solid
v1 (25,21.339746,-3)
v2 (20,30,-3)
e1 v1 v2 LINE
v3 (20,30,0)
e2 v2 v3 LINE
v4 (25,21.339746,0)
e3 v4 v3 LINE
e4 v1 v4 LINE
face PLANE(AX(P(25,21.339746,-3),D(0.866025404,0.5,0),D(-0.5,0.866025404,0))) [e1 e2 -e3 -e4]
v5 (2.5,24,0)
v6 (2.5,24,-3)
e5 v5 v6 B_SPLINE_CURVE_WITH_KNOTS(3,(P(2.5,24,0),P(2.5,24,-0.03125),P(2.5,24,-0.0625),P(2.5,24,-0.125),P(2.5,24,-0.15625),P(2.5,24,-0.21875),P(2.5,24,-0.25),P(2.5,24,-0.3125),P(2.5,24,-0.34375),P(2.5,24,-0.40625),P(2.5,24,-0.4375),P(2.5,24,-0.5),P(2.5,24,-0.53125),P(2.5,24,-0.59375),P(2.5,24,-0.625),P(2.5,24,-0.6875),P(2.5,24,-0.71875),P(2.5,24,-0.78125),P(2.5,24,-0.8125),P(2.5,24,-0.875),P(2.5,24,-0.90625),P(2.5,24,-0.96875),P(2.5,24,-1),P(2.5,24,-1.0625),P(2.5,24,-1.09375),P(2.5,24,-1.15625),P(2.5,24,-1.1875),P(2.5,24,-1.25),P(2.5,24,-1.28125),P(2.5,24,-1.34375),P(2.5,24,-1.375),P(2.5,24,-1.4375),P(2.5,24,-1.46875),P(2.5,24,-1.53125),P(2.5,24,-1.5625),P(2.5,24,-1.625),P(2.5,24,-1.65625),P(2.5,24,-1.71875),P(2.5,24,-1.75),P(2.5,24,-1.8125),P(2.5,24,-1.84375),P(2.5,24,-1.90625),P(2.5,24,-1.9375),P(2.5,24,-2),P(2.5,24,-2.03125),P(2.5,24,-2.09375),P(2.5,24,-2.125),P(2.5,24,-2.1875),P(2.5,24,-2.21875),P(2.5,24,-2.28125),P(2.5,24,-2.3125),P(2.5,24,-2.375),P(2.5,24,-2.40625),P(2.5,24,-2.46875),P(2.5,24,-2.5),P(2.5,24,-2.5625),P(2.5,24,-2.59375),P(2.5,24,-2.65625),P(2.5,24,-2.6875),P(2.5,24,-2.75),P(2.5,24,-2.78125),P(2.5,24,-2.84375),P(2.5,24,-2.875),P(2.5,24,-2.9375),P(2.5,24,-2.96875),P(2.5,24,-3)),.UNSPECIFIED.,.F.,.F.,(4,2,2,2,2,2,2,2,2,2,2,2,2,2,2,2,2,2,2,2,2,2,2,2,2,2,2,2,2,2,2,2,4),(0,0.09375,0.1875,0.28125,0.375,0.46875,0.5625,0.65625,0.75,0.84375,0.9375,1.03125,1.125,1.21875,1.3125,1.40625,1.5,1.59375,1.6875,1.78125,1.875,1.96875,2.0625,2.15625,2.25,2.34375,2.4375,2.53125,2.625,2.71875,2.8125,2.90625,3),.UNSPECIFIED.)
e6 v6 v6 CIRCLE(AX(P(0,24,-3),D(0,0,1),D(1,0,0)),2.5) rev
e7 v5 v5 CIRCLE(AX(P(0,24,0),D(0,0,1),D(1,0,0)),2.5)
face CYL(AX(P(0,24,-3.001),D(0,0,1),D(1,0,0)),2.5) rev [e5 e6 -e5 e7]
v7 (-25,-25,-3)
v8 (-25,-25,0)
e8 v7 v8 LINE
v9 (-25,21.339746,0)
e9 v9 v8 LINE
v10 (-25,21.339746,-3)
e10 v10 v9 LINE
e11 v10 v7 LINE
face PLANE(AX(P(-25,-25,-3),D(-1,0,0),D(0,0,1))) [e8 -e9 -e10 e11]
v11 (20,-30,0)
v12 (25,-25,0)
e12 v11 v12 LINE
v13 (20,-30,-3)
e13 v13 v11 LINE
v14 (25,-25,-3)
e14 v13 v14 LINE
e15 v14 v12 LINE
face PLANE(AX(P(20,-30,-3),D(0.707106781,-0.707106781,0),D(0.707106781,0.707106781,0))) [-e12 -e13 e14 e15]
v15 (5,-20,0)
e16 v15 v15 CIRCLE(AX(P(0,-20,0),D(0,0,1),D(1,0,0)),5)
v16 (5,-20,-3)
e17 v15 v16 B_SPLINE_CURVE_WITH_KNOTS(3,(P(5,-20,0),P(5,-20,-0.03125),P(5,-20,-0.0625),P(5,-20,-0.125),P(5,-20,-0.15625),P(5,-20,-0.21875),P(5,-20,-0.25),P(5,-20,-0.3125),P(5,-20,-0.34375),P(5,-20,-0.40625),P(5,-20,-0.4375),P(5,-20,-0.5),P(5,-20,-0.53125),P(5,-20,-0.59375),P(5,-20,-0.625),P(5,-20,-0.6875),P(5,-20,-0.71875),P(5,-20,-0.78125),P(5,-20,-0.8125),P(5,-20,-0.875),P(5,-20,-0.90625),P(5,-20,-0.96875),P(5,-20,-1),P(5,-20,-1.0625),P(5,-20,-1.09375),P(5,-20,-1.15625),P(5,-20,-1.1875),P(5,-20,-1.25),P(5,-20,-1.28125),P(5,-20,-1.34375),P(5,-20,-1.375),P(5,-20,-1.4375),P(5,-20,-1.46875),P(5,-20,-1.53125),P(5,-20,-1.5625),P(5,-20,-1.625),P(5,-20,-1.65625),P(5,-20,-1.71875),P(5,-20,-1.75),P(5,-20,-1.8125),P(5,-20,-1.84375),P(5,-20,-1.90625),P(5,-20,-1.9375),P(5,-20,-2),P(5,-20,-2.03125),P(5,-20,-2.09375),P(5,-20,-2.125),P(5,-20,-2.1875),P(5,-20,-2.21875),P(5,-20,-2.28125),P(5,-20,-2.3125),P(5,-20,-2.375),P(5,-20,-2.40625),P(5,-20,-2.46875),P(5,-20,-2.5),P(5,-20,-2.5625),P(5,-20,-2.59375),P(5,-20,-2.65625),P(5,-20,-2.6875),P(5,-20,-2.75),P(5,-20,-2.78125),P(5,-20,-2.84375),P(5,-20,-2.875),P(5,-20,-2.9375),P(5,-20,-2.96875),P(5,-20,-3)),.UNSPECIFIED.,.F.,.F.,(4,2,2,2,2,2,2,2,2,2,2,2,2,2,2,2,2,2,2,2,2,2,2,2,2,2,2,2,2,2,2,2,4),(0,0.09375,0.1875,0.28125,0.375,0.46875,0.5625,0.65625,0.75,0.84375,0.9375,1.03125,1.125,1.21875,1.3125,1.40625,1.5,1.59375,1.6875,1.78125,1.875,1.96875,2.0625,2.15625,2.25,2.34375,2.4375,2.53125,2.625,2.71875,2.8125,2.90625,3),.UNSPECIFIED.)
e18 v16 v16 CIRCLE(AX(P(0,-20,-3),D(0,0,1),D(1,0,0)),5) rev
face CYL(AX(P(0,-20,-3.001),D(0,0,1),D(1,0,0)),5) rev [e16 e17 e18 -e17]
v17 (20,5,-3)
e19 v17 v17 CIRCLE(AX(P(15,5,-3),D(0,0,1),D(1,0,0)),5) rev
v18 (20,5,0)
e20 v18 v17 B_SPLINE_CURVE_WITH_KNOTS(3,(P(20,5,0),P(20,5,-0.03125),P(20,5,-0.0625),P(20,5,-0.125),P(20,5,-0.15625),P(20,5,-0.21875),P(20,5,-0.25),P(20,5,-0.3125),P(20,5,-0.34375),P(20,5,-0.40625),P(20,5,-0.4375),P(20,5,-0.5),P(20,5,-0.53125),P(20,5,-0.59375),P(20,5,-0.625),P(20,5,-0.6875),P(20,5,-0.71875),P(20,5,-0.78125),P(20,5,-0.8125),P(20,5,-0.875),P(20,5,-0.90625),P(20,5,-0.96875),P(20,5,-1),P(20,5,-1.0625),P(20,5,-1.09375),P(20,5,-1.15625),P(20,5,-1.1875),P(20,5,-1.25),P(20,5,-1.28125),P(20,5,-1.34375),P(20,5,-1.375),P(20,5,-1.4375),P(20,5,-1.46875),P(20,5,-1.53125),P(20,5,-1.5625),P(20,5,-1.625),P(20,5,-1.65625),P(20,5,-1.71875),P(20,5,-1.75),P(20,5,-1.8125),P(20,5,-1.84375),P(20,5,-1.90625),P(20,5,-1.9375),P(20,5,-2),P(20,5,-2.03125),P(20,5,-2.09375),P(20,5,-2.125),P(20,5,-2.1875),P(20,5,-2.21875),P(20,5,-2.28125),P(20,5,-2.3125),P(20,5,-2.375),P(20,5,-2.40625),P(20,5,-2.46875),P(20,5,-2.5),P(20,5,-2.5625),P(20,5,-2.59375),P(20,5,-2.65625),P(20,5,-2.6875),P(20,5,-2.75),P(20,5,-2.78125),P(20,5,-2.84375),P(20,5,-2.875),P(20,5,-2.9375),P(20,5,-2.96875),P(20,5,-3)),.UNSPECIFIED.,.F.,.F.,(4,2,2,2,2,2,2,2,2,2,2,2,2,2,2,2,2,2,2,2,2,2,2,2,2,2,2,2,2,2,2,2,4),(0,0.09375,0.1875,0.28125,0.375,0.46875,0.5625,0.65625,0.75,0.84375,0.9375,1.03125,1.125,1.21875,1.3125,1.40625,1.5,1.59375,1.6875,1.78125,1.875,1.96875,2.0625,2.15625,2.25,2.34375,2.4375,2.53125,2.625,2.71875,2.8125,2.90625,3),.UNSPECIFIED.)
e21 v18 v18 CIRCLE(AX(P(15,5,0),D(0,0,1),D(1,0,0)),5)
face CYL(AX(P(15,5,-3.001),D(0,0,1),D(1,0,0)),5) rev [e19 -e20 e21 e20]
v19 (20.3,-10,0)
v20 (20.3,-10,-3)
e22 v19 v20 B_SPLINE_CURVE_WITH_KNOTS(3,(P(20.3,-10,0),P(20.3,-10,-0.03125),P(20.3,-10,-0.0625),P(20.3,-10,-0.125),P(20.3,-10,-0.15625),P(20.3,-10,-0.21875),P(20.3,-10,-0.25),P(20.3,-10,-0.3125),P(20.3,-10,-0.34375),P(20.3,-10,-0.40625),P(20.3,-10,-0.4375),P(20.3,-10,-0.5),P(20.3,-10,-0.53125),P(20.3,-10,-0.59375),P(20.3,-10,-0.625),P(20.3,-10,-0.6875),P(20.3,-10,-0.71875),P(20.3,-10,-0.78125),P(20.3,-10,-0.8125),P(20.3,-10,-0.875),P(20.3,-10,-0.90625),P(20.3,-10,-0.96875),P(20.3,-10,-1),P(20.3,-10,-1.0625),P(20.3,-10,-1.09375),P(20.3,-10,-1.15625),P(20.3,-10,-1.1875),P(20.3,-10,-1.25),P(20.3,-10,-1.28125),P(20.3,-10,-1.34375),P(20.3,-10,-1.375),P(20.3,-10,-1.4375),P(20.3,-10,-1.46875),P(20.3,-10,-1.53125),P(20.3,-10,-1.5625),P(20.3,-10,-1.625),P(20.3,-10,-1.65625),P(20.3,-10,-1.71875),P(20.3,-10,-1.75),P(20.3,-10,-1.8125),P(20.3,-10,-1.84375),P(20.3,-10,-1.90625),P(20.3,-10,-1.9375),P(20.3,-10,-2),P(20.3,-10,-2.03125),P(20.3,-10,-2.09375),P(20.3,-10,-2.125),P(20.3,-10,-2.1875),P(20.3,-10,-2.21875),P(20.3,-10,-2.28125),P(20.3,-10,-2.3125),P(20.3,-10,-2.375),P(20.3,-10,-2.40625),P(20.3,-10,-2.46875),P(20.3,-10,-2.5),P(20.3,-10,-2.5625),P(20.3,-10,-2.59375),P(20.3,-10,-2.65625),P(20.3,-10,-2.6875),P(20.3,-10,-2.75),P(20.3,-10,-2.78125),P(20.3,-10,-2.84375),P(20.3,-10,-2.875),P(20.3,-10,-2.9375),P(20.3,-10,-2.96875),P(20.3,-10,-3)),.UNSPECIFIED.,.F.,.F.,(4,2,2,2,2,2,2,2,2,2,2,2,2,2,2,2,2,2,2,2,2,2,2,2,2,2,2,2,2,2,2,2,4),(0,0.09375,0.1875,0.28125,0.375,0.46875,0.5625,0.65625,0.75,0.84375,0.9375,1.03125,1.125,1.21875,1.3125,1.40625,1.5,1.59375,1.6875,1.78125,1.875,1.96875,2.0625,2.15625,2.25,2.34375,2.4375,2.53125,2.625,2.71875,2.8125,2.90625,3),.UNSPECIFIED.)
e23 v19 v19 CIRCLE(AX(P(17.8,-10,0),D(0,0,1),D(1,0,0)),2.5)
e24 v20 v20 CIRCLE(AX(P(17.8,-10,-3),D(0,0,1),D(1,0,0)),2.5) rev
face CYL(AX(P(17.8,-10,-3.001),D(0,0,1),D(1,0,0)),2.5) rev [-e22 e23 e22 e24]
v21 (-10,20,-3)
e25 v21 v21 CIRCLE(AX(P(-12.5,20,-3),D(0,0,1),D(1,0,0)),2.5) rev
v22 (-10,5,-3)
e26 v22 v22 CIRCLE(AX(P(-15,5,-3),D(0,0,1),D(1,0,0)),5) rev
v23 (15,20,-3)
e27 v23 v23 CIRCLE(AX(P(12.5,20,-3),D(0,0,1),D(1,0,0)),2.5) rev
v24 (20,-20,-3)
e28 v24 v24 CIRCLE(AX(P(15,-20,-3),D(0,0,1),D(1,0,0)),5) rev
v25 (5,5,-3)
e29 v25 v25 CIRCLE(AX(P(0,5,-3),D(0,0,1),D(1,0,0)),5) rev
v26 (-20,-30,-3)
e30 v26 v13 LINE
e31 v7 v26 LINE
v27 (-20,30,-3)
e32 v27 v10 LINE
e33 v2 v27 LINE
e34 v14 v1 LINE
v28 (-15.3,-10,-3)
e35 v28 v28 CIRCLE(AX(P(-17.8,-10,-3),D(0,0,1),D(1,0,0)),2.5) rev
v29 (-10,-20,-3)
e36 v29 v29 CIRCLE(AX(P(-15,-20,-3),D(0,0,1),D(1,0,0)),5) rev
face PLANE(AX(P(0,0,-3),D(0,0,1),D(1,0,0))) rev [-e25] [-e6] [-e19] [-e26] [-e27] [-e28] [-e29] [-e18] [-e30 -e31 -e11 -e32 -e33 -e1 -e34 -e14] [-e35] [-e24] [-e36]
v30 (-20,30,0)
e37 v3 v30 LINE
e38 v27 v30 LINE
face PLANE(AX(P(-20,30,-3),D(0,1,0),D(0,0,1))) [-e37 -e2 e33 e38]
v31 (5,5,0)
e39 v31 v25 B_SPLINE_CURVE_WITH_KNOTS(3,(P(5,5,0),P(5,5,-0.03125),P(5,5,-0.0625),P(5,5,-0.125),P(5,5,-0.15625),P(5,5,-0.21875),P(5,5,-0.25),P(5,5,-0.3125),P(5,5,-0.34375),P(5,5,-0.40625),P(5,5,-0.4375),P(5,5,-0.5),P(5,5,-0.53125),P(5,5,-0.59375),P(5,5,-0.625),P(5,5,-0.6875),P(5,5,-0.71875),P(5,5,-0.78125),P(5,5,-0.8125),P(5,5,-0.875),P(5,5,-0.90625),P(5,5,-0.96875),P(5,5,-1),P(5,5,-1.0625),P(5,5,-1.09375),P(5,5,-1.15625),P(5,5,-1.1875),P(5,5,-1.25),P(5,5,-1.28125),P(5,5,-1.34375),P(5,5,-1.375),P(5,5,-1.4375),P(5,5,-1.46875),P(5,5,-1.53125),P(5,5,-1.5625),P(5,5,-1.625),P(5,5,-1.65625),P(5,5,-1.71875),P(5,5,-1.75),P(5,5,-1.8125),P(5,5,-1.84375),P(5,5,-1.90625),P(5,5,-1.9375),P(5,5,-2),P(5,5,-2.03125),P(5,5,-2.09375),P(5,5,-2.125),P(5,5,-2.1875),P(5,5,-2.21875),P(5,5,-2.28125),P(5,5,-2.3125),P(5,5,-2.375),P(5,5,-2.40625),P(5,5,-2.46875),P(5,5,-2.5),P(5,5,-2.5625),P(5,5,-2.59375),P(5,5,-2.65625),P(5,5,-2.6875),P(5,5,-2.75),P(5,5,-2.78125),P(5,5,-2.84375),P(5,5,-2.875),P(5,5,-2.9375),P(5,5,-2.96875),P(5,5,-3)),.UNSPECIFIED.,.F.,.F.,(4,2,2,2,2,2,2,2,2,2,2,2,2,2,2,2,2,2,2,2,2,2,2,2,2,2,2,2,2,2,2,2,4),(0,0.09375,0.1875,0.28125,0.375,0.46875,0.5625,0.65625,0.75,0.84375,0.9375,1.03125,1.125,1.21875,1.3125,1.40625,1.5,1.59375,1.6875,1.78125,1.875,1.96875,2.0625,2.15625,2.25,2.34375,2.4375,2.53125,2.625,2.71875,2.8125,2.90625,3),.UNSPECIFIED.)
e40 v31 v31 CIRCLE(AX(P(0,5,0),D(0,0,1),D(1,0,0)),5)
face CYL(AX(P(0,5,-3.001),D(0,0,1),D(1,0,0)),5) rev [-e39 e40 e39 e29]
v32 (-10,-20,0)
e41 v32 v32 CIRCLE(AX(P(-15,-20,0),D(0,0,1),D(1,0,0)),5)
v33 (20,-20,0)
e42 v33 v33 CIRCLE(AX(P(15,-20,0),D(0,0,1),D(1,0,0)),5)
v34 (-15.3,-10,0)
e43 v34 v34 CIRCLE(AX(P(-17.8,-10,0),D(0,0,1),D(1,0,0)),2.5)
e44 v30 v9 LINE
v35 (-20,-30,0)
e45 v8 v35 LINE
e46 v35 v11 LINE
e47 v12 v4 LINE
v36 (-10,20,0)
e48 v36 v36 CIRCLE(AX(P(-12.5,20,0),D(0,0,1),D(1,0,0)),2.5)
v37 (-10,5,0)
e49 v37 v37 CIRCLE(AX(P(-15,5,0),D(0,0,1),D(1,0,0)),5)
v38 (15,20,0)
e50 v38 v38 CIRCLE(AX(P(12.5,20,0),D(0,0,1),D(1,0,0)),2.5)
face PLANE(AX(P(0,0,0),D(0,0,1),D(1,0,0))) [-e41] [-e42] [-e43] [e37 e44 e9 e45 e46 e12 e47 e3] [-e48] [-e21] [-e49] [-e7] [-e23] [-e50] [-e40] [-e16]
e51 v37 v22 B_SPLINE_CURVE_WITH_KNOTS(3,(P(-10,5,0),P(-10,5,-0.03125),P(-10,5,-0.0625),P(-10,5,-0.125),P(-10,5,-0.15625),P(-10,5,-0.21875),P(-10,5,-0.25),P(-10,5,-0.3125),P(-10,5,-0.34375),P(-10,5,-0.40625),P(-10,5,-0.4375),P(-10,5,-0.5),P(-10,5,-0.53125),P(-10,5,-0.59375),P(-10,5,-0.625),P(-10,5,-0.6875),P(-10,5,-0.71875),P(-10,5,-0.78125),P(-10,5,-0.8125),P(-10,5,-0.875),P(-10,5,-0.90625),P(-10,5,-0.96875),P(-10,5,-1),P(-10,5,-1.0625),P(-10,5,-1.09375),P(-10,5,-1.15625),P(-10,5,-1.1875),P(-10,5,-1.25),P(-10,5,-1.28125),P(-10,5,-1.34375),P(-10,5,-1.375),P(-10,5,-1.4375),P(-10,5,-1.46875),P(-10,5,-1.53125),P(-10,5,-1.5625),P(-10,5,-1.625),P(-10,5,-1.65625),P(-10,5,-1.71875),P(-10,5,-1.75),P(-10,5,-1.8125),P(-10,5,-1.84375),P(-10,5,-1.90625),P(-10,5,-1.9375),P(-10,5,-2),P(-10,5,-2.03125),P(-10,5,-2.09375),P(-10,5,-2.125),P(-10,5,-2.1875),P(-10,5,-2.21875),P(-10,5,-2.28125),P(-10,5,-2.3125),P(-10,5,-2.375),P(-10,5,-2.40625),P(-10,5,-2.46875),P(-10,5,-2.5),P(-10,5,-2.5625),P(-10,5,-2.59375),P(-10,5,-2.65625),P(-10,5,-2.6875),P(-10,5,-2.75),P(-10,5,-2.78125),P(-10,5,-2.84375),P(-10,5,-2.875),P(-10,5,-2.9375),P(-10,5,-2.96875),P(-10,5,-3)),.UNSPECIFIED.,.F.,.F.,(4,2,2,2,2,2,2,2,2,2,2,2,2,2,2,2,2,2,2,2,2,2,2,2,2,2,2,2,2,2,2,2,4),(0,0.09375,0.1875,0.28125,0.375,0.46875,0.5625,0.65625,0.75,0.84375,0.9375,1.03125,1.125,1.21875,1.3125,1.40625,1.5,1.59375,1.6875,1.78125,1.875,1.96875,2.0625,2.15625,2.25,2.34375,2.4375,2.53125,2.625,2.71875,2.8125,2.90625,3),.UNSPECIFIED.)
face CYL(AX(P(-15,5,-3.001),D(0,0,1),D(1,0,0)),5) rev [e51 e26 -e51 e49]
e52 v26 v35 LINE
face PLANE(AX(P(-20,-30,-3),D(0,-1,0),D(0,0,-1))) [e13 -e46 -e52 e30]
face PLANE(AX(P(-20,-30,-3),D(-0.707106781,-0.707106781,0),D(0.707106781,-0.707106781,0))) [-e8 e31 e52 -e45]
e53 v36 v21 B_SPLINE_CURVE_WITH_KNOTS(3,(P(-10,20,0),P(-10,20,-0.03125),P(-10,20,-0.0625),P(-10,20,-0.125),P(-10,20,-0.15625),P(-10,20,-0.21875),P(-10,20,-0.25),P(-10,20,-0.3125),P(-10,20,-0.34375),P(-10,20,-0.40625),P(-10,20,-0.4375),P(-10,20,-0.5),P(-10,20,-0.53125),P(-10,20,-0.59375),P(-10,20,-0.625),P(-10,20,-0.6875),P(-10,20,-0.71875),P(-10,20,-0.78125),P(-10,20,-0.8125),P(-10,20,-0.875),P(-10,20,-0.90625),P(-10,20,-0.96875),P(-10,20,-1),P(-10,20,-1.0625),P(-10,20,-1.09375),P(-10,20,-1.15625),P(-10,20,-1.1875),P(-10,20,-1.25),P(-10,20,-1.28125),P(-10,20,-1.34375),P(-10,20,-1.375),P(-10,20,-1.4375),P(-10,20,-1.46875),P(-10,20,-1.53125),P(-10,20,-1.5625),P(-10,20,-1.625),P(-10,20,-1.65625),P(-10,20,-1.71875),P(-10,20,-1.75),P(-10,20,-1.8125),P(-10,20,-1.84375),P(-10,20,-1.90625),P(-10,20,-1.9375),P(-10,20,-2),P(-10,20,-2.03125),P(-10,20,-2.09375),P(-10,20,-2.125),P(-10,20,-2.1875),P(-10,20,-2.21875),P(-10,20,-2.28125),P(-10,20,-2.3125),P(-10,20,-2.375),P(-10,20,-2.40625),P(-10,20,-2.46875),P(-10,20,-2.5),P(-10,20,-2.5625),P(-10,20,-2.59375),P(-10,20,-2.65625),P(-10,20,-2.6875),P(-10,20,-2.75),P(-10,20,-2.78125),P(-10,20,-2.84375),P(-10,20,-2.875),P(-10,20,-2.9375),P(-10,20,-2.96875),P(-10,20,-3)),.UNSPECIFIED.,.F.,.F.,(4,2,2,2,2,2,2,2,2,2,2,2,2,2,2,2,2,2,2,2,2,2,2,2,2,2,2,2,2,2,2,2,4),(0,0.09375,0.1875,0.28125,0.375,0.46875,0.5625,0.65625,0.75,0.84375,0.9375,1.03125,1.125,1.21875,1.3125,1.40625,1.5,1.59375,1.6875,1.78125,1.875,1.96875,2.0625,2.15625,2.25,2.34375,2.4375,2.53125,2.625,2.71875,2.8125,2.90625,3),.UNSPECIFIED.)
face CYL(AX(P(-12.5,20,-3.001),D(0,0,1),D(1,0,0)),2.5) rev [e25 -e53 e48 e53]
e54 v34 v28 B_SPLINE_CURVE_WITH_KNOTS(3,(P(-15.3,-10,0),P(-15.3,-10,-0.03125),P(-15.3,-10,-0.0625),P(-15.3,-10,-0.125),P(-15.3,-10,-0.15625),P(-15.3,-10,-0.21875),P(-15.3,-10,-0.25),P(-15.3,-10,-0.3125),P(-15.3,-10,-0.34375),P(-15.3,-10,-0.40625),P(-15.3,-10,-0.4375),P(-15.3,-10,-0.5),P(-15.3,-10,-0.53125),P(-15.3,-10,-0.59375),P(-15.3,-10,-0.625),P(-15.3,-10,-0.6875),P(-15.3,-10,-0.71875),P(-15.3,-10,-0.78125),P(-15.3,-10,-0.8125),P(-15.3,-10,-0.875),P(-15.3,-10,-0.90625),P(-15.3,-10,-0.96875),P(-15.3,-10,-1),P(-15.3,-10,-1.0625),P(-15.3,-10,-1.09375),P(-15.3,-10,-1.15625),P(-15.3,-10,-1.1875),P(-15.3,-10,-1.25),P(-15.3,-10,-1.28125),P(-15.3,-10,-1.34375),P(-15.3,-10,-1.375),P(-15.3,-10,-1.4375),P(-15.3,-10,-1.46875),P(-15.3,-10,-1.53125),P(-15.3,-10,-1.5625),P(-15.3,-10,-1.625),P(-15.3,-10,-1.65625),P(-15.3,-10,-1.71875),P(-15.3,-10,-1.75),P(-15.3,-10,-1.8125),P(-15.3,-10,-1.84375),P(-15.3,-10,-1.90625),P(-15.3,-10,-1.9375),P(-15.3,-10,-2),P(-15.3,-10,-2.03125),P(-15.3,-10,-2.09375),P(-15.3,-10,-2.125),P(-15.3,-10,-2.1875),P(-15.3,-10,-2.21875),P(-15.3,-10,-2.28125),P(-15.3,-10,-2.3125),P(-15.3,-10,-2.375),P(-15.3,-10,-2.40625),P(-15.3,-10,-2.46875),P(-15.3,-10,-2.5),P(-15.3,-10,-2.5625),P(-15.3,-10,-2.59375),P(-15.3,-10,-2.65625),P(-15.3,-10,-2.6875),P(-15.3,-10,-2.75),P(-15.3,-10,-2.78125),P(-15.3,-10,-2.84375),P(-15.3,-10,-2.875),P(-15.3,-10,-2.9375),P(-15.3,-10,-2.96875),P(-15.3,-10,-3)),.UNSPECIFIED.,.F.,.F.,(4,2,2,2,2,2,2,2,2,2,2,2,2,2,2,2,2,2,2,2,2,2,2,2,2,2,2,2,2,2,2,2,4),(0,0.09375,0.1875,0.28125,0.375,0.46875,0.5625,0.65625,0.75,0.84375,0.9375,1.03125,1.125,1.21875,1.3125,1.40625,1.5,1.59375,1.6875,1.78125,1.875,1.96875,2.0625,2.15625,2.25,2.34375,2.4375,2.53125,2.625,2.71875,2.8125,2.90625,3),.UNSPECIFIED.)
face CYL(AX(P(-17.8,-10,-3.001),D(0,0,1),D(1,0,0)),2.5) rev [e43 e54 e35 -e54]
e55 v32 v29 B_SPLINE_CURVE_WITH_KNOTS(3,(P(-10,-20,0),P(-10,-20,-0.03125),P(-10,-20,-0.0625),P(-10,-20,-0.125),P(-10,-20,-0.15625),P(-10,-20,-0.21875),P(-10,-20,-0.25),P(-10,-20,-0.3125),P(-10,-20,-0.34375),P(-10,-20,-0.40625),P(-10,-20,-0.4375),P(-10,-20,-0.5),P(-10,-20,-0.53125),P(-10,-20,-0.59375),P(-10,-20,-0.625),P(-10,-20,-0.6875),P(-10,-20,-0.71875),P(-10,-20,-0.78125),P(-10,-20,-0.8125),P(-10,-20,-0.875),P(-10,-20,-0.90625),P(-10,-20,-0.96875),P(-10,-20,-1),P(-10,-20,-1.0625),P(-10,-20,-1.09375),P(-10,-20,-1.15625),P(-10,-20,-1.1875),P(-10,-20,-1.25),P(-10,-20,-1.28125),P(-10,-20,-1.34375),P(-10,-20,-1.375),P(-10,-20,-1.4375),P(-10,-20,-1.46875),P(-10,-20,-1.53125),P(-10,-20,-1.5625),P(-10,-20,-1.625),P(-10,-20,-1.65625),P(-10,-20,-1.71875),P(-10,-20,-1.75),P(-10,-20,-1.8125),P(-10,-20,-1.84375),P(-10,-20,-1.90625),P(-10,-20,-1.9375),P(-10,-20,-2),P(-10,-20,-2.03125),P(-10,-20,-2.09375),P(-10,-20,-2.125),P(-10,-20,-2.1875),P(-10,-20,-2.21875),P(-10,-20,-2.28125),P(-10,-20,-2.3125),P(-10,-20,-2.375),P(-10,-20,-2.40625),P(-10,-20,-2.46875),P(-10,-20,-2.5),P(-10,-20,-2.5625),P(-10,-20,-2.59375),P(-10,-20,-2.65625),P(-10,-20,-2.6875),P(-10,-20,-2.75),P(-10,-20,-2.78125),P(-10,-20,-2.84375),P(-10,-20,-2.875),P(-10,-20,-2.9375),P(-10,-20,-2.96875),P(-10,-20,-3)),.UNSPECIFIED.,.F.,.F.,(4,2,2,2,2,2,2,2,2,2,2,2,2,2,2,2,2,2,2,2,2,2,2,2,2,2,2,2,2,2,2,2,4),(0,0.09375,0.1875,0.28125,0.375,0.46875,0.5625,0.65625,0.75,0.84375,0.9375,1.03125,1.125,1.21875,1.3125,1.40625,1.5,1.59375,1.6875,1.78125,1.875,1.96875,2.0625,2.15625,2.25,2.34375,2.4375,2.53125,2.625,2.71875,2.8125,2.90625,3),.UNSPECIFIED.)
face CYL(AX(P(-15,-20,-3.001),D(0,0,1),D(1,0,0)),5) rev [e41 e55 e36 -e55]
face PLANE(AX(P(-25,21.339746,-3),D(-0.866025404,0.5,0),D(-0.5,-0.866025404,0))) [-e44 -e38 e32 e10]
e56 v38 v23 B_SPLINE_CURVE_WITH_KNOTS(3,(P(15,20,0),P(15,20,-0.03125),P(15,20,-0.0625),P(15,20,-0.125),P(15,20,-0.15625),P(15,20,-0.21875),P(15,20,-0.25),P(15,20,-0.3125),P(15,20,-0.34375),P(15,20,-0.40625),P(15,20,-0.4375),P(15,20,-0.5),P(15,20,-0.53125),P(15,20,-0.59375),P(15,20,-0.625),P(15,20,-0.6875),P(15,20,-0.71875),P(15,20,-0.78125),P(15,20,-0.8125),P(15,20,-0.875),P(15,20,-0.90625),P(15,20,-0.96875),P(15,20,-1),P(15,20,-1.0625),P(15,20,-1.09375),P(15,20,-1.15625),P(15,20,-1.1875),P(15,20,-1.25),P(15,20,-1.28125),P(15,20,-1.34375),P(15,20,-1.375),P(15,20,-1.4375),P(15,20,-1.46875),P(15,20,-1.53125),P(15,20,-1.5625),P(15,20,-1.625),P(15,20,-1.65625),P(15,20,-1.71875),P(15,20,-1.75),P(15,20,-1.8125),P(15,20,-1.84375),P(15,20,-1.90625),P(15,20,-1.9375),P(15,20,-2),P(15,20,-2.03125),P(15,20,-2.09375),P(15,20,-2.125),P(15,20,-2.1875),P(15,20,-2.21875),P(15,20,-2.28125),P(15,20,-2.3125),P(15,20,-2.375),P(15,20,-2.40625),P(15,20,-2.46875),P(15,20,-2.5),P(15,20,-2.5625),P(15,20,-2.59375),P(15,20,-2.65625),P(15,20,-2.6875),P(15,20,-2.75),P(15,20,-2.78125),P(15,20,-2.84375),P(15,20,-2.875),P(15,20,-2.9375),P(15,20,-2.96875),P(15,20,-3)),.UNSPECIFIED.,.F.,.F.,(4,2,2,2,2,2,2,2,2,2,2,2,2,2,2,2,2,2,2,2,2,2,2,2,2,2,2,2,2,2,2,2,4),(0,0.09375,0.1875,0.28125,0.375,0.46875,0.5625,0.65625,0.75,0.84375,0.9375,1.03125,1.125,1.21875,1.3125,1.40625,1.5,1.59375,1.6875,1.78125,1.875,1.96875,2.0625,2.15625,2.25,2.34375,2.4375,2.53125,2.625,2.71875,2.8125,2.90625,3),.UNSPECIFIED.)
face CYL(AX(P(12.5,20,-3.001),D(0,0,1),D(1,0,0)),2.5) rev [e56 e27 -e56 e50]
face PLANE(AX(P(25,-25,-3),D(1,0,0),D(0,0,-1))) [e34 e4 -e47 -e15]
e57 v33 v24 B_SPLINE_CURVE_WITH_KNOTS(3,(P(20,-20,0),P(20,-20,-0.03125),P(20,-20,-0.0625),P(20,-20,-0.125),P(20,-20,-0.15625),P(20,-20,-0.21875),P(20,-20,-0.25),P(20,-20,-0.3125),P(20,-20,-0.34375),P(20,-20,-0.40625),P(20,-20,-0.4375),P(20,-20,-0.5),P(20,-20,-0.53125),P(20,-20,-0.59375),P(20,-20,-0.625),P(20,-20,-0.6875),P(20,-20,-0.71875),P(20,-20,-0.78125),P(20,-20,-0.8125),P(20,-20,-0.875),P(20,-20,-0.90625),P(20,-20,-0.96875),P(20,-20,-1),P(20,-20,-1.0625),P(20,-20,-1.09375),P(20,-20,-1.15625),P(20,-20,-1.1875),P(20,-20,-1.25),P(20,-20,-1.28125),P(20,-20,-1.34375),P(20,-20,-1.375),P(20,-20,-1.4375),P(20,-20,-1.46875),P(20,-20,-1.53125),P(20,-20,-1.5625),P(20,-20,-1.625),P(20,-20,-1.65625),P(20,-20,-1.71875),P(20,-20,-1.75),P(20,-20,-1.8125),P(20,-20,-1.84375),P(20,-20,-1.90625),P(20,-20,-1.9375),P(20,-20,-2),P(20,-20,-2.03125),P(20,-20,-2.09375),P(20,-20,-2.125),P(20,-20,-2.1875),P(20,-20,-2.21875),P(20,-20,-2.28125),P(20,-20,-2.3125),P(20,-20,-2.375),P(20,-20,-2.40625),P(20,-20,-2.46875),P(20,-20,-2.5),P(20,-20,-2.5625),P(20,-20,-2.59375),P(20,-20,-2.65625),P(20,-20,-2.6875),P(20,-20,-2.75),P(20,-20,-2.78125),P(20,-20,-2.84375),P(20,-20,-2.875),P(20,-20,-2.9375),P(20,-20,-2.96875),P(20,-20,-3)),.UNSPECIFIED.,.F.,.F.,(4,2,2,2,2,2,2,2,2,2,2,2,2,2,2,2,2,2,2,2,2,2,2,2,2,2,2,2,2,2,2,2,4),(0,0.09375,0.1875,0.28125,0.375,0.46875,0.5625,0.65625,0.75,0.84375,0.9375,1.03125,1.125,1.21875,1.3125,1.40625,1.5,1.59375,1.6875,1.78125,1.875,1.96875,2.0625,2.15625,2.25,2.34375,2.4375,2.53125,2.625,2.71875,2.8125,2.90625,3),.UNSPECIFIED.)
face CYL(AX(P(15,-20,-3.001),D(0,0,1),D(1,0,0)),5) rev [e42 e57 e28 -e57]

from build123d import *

# Parameters (mm, degrees)
SM_BASE_FLANGE_1_DEPTH = 3
CUT_EXTRUDE_1_REACH    = 41.166
SKETCH_6_R             = 2.5
CUT_EXTRUDE_2_REACH    = 41.166
SKETCH_7_R             = 5


# Sheet-metal steps are written as plain solids
with BuildPart() as part:
    # Sketch 1 → 基体-法兰1 (new body)
    with BuildSketch(Plane.XY):
        Polygon((20, -30), (14.284239003, -30), (-14.284239003, -30), (-20, -30), (-25, -25), (-25, 21.339745962), (-20, 30), (20, 30), (25, 21.339745962), (25, -25), align=None)
    extrude(amount=-SM_BASE_FLANGE_1_DEPTH)

    # 草图6 → 切除-拉伸1 (cut, up to next)
    with BuildSketch(Plane.XY, mode=Mode.PRIVATE) as cut_extrude_1_sk1:
        with Locations((0, 24)):
            Circle(SKETCH_6_R)
    cut_extrude_1_tool1 = extrude(cut_extrude_1_sk1.sketch, amount=-CUT_EXTRUDE_1_REACH, mode=Mode.PRIVATE) & part.part
    # 草图6 → 切除-拉伸1 (cut, up to next)
    with BuildSketch(Plane.XY, mode=Mode.PRIVATE) as cut_extrude_1_sk2:
        with Locations((-17.8, -10)):
            Circle(SKETCH_6_R)
    cut_extrude_1_tool2 = extrude(cut_extrude_1_sk2.sketch, amount=-CUT_EXTRUDE_1_REACH, mode=Mode.PRIVATE) & part.part
    # 草图6 → 切除-拉伸1 (cut, up to next)
    with BuildSketch(Plane.XY, mode=Mode.PRIVATE) as cut_extrude_1_sk3:
        with Locations((17.8, -10)):
            Circle(SKETCH_6_R)
    cut_extrude_1_tool3 = extrude(cut_extrude_1_sk3.sketch, amount=-CUT_EXTRUDE_1_REACH, mode=Mode.PRIVATE) & part.part
    # 草图6 → 切除-拉伸1 (cut, up to next)
    with BuildSketch(Plane.XY, mode=Mode.PRIVATE) as cut_extrude_1_sk4:
        with Locations((-12.5, 20)):
            Circle(SKETCH_6_R)
    cut_extrude_1_tool4 = extrude(cut_extrude_1_sk4.sketch, amount=-CUT_EXTRUDE_1_REACH, mode=Mode.PRIVATE) & part.part
    # 草图6 → 切除-拉伸1 (cut, up to next)
    with BuildSketch(Plane.XY, mode=Mode.PRIVATE) as cut_extrude_1_sk5:
        with Locations((12.5, 20)):
            Circle(SKETCH_6_R)
    cut_extrude_1_tool5 = extrude(cut_extrude_1_sk5.sketch, amount=-CUT_EXTRUDE_1_REACH, mode=Mode.PRIVATE) & part.part
    add(cut_extrude_1_tool1.solids().sort_by_distance((0, 24, 0))[0], mode=Mode.SUBTRACT)
    add(cut_extrude_1_tool2.solids().sort_by_distance((-17.8, -10, 0))[0], mode=Mode.SUBTRACT)
    add(cut_extrude_1_tool3.solids().sort_by_distance((17.8, -10, 0))[0], mode=Mode.SUBTRACT)
    add(cut_extrude_1_tool4.solids().sort_by_distance((-12.5, 20, 0))[0], mode=Mode.SUBTRACT)
    add(cut_extrude_1_tool5.solids().sort_by_distance((12.5, 20, 0))[0], mode=Mode.SUBTRACT)

    # 草图7 → 切除-拉伸2 (cut, up to next)
    with BuildSketch(Plane.XY, mode=Mode.PRIVATE) as cut_extrude_2_sk1:
        with Locations((-15, 5)):
            Circle(SKETCH_7_R)
    cut_extrude_2_tool1 = extrude(cut_extrude_2_sk1.sketch, amount=-CUT_EXTRUDE_2_REACH, mode=Mode.PRIVATE) & part.part
    # 草图7 → 切除-拉伸2 (cut, up to next)
    with BuildSketch(Plane.XY, mode=Mode.PRIVATE) as cut_extrude_2_sk2:
        with Locations((15, 5)):
            Circle(SKETCH_7_R)
    cut_extrude_2_tool2 = extrude(cut_extrude_2_sk2.sketch, amount=-CUT_EXTRUDE_2_REACH, mode=Mode.PRIVATE) & part.part
    # 草图7 → 切除-拉伸2 (cut, up to next)
    with BuildSketch(Plane.XY, mode=Mode.PRIVATE) as cut_extrude_2_sk3:
        with Locations((0, -20)):
            Circle(SKETCH_7_R)
    cut_extrude_2_tool3 = extrude(cut_extrude_2_sk3.sketch, amount=-CUT_EXTRUDE_2_REACH, mode=Mode.PRIVATE) & part.part
    # 草图7 → 切除-拉伸2 (cut, up to next)
    with BuildSketch(Plane.XY, mode=Mode.PRIVATE) as cut_extrude_2_sk4:
        with Locations((-15, -20)):
            Circle(SKETCH_7_R)
    cut_extrude_2_tool4 = extrude(cut_extrude_2_sk4.sketch, amount=-CUT_EXTRUDE_2_REACH, mode=Mode.PRIVATE) & part.part
    # 草图7 → 切除-拉伸2 (cut, up to next)
    with BuildSketch(Plane.XY, mode=Mode.PRIVATE) as cut_extrude_2_sk5:
        with Locations((15, -20)):
            Circle(SKETCH_7_R)
    cut_extrude_2_tool5 = extrude(cut_extrude_2_sk5.sketch, amount=-CUT_EXTRUDE_2_REACH, mode=Mode.PRIVATE) & part.part
    # 草图7 → 切除-拉伸2 (cut, up to next)
    with BuildSketch(Plane.XY, mode=Mode.PRIVATE) as cut_extrude_2_sk6:
        with Locations((0, 5)):
            Circle(SKETCH_7_R)
    cut_extrude_2_tool6 = extrude(cut_extrude_2_sk6.sketch, amount=-CUT_EXTRUDE_2_REACH, mode=Mode.PRIVATE) & part.part
    add(cut_extrude_2_tool1.solids().sort_by_distance((-15, 5, 0))[0], mode=Mode.SUBTRACT)
    add(cut_extrude_2_tool2.solids().sort_by_distance((15, 5, 0))[0], mode=Mode.SUBTRACT)
    add(cut_extrude_2_tool3.solids().sort_by_distance((0, -20, 0))[0], mode=Mode.SUBTRACT)
    add(cut_extrude_2_tool4.solids().sort_by_distance((-15, -20, 0))[0], mode=Mode.SUBTRACT)
    add(cut_extrude_2_tool5.solids().sort_by_distance((15, -20, 0))[0], mode=Mode.SUBTRACT)
    add(cut_extrude_2_tool6.solids().sort_by_distance((0, 5, 0))[0], mode=Mode.SUBTRACT)


solid = part.part
